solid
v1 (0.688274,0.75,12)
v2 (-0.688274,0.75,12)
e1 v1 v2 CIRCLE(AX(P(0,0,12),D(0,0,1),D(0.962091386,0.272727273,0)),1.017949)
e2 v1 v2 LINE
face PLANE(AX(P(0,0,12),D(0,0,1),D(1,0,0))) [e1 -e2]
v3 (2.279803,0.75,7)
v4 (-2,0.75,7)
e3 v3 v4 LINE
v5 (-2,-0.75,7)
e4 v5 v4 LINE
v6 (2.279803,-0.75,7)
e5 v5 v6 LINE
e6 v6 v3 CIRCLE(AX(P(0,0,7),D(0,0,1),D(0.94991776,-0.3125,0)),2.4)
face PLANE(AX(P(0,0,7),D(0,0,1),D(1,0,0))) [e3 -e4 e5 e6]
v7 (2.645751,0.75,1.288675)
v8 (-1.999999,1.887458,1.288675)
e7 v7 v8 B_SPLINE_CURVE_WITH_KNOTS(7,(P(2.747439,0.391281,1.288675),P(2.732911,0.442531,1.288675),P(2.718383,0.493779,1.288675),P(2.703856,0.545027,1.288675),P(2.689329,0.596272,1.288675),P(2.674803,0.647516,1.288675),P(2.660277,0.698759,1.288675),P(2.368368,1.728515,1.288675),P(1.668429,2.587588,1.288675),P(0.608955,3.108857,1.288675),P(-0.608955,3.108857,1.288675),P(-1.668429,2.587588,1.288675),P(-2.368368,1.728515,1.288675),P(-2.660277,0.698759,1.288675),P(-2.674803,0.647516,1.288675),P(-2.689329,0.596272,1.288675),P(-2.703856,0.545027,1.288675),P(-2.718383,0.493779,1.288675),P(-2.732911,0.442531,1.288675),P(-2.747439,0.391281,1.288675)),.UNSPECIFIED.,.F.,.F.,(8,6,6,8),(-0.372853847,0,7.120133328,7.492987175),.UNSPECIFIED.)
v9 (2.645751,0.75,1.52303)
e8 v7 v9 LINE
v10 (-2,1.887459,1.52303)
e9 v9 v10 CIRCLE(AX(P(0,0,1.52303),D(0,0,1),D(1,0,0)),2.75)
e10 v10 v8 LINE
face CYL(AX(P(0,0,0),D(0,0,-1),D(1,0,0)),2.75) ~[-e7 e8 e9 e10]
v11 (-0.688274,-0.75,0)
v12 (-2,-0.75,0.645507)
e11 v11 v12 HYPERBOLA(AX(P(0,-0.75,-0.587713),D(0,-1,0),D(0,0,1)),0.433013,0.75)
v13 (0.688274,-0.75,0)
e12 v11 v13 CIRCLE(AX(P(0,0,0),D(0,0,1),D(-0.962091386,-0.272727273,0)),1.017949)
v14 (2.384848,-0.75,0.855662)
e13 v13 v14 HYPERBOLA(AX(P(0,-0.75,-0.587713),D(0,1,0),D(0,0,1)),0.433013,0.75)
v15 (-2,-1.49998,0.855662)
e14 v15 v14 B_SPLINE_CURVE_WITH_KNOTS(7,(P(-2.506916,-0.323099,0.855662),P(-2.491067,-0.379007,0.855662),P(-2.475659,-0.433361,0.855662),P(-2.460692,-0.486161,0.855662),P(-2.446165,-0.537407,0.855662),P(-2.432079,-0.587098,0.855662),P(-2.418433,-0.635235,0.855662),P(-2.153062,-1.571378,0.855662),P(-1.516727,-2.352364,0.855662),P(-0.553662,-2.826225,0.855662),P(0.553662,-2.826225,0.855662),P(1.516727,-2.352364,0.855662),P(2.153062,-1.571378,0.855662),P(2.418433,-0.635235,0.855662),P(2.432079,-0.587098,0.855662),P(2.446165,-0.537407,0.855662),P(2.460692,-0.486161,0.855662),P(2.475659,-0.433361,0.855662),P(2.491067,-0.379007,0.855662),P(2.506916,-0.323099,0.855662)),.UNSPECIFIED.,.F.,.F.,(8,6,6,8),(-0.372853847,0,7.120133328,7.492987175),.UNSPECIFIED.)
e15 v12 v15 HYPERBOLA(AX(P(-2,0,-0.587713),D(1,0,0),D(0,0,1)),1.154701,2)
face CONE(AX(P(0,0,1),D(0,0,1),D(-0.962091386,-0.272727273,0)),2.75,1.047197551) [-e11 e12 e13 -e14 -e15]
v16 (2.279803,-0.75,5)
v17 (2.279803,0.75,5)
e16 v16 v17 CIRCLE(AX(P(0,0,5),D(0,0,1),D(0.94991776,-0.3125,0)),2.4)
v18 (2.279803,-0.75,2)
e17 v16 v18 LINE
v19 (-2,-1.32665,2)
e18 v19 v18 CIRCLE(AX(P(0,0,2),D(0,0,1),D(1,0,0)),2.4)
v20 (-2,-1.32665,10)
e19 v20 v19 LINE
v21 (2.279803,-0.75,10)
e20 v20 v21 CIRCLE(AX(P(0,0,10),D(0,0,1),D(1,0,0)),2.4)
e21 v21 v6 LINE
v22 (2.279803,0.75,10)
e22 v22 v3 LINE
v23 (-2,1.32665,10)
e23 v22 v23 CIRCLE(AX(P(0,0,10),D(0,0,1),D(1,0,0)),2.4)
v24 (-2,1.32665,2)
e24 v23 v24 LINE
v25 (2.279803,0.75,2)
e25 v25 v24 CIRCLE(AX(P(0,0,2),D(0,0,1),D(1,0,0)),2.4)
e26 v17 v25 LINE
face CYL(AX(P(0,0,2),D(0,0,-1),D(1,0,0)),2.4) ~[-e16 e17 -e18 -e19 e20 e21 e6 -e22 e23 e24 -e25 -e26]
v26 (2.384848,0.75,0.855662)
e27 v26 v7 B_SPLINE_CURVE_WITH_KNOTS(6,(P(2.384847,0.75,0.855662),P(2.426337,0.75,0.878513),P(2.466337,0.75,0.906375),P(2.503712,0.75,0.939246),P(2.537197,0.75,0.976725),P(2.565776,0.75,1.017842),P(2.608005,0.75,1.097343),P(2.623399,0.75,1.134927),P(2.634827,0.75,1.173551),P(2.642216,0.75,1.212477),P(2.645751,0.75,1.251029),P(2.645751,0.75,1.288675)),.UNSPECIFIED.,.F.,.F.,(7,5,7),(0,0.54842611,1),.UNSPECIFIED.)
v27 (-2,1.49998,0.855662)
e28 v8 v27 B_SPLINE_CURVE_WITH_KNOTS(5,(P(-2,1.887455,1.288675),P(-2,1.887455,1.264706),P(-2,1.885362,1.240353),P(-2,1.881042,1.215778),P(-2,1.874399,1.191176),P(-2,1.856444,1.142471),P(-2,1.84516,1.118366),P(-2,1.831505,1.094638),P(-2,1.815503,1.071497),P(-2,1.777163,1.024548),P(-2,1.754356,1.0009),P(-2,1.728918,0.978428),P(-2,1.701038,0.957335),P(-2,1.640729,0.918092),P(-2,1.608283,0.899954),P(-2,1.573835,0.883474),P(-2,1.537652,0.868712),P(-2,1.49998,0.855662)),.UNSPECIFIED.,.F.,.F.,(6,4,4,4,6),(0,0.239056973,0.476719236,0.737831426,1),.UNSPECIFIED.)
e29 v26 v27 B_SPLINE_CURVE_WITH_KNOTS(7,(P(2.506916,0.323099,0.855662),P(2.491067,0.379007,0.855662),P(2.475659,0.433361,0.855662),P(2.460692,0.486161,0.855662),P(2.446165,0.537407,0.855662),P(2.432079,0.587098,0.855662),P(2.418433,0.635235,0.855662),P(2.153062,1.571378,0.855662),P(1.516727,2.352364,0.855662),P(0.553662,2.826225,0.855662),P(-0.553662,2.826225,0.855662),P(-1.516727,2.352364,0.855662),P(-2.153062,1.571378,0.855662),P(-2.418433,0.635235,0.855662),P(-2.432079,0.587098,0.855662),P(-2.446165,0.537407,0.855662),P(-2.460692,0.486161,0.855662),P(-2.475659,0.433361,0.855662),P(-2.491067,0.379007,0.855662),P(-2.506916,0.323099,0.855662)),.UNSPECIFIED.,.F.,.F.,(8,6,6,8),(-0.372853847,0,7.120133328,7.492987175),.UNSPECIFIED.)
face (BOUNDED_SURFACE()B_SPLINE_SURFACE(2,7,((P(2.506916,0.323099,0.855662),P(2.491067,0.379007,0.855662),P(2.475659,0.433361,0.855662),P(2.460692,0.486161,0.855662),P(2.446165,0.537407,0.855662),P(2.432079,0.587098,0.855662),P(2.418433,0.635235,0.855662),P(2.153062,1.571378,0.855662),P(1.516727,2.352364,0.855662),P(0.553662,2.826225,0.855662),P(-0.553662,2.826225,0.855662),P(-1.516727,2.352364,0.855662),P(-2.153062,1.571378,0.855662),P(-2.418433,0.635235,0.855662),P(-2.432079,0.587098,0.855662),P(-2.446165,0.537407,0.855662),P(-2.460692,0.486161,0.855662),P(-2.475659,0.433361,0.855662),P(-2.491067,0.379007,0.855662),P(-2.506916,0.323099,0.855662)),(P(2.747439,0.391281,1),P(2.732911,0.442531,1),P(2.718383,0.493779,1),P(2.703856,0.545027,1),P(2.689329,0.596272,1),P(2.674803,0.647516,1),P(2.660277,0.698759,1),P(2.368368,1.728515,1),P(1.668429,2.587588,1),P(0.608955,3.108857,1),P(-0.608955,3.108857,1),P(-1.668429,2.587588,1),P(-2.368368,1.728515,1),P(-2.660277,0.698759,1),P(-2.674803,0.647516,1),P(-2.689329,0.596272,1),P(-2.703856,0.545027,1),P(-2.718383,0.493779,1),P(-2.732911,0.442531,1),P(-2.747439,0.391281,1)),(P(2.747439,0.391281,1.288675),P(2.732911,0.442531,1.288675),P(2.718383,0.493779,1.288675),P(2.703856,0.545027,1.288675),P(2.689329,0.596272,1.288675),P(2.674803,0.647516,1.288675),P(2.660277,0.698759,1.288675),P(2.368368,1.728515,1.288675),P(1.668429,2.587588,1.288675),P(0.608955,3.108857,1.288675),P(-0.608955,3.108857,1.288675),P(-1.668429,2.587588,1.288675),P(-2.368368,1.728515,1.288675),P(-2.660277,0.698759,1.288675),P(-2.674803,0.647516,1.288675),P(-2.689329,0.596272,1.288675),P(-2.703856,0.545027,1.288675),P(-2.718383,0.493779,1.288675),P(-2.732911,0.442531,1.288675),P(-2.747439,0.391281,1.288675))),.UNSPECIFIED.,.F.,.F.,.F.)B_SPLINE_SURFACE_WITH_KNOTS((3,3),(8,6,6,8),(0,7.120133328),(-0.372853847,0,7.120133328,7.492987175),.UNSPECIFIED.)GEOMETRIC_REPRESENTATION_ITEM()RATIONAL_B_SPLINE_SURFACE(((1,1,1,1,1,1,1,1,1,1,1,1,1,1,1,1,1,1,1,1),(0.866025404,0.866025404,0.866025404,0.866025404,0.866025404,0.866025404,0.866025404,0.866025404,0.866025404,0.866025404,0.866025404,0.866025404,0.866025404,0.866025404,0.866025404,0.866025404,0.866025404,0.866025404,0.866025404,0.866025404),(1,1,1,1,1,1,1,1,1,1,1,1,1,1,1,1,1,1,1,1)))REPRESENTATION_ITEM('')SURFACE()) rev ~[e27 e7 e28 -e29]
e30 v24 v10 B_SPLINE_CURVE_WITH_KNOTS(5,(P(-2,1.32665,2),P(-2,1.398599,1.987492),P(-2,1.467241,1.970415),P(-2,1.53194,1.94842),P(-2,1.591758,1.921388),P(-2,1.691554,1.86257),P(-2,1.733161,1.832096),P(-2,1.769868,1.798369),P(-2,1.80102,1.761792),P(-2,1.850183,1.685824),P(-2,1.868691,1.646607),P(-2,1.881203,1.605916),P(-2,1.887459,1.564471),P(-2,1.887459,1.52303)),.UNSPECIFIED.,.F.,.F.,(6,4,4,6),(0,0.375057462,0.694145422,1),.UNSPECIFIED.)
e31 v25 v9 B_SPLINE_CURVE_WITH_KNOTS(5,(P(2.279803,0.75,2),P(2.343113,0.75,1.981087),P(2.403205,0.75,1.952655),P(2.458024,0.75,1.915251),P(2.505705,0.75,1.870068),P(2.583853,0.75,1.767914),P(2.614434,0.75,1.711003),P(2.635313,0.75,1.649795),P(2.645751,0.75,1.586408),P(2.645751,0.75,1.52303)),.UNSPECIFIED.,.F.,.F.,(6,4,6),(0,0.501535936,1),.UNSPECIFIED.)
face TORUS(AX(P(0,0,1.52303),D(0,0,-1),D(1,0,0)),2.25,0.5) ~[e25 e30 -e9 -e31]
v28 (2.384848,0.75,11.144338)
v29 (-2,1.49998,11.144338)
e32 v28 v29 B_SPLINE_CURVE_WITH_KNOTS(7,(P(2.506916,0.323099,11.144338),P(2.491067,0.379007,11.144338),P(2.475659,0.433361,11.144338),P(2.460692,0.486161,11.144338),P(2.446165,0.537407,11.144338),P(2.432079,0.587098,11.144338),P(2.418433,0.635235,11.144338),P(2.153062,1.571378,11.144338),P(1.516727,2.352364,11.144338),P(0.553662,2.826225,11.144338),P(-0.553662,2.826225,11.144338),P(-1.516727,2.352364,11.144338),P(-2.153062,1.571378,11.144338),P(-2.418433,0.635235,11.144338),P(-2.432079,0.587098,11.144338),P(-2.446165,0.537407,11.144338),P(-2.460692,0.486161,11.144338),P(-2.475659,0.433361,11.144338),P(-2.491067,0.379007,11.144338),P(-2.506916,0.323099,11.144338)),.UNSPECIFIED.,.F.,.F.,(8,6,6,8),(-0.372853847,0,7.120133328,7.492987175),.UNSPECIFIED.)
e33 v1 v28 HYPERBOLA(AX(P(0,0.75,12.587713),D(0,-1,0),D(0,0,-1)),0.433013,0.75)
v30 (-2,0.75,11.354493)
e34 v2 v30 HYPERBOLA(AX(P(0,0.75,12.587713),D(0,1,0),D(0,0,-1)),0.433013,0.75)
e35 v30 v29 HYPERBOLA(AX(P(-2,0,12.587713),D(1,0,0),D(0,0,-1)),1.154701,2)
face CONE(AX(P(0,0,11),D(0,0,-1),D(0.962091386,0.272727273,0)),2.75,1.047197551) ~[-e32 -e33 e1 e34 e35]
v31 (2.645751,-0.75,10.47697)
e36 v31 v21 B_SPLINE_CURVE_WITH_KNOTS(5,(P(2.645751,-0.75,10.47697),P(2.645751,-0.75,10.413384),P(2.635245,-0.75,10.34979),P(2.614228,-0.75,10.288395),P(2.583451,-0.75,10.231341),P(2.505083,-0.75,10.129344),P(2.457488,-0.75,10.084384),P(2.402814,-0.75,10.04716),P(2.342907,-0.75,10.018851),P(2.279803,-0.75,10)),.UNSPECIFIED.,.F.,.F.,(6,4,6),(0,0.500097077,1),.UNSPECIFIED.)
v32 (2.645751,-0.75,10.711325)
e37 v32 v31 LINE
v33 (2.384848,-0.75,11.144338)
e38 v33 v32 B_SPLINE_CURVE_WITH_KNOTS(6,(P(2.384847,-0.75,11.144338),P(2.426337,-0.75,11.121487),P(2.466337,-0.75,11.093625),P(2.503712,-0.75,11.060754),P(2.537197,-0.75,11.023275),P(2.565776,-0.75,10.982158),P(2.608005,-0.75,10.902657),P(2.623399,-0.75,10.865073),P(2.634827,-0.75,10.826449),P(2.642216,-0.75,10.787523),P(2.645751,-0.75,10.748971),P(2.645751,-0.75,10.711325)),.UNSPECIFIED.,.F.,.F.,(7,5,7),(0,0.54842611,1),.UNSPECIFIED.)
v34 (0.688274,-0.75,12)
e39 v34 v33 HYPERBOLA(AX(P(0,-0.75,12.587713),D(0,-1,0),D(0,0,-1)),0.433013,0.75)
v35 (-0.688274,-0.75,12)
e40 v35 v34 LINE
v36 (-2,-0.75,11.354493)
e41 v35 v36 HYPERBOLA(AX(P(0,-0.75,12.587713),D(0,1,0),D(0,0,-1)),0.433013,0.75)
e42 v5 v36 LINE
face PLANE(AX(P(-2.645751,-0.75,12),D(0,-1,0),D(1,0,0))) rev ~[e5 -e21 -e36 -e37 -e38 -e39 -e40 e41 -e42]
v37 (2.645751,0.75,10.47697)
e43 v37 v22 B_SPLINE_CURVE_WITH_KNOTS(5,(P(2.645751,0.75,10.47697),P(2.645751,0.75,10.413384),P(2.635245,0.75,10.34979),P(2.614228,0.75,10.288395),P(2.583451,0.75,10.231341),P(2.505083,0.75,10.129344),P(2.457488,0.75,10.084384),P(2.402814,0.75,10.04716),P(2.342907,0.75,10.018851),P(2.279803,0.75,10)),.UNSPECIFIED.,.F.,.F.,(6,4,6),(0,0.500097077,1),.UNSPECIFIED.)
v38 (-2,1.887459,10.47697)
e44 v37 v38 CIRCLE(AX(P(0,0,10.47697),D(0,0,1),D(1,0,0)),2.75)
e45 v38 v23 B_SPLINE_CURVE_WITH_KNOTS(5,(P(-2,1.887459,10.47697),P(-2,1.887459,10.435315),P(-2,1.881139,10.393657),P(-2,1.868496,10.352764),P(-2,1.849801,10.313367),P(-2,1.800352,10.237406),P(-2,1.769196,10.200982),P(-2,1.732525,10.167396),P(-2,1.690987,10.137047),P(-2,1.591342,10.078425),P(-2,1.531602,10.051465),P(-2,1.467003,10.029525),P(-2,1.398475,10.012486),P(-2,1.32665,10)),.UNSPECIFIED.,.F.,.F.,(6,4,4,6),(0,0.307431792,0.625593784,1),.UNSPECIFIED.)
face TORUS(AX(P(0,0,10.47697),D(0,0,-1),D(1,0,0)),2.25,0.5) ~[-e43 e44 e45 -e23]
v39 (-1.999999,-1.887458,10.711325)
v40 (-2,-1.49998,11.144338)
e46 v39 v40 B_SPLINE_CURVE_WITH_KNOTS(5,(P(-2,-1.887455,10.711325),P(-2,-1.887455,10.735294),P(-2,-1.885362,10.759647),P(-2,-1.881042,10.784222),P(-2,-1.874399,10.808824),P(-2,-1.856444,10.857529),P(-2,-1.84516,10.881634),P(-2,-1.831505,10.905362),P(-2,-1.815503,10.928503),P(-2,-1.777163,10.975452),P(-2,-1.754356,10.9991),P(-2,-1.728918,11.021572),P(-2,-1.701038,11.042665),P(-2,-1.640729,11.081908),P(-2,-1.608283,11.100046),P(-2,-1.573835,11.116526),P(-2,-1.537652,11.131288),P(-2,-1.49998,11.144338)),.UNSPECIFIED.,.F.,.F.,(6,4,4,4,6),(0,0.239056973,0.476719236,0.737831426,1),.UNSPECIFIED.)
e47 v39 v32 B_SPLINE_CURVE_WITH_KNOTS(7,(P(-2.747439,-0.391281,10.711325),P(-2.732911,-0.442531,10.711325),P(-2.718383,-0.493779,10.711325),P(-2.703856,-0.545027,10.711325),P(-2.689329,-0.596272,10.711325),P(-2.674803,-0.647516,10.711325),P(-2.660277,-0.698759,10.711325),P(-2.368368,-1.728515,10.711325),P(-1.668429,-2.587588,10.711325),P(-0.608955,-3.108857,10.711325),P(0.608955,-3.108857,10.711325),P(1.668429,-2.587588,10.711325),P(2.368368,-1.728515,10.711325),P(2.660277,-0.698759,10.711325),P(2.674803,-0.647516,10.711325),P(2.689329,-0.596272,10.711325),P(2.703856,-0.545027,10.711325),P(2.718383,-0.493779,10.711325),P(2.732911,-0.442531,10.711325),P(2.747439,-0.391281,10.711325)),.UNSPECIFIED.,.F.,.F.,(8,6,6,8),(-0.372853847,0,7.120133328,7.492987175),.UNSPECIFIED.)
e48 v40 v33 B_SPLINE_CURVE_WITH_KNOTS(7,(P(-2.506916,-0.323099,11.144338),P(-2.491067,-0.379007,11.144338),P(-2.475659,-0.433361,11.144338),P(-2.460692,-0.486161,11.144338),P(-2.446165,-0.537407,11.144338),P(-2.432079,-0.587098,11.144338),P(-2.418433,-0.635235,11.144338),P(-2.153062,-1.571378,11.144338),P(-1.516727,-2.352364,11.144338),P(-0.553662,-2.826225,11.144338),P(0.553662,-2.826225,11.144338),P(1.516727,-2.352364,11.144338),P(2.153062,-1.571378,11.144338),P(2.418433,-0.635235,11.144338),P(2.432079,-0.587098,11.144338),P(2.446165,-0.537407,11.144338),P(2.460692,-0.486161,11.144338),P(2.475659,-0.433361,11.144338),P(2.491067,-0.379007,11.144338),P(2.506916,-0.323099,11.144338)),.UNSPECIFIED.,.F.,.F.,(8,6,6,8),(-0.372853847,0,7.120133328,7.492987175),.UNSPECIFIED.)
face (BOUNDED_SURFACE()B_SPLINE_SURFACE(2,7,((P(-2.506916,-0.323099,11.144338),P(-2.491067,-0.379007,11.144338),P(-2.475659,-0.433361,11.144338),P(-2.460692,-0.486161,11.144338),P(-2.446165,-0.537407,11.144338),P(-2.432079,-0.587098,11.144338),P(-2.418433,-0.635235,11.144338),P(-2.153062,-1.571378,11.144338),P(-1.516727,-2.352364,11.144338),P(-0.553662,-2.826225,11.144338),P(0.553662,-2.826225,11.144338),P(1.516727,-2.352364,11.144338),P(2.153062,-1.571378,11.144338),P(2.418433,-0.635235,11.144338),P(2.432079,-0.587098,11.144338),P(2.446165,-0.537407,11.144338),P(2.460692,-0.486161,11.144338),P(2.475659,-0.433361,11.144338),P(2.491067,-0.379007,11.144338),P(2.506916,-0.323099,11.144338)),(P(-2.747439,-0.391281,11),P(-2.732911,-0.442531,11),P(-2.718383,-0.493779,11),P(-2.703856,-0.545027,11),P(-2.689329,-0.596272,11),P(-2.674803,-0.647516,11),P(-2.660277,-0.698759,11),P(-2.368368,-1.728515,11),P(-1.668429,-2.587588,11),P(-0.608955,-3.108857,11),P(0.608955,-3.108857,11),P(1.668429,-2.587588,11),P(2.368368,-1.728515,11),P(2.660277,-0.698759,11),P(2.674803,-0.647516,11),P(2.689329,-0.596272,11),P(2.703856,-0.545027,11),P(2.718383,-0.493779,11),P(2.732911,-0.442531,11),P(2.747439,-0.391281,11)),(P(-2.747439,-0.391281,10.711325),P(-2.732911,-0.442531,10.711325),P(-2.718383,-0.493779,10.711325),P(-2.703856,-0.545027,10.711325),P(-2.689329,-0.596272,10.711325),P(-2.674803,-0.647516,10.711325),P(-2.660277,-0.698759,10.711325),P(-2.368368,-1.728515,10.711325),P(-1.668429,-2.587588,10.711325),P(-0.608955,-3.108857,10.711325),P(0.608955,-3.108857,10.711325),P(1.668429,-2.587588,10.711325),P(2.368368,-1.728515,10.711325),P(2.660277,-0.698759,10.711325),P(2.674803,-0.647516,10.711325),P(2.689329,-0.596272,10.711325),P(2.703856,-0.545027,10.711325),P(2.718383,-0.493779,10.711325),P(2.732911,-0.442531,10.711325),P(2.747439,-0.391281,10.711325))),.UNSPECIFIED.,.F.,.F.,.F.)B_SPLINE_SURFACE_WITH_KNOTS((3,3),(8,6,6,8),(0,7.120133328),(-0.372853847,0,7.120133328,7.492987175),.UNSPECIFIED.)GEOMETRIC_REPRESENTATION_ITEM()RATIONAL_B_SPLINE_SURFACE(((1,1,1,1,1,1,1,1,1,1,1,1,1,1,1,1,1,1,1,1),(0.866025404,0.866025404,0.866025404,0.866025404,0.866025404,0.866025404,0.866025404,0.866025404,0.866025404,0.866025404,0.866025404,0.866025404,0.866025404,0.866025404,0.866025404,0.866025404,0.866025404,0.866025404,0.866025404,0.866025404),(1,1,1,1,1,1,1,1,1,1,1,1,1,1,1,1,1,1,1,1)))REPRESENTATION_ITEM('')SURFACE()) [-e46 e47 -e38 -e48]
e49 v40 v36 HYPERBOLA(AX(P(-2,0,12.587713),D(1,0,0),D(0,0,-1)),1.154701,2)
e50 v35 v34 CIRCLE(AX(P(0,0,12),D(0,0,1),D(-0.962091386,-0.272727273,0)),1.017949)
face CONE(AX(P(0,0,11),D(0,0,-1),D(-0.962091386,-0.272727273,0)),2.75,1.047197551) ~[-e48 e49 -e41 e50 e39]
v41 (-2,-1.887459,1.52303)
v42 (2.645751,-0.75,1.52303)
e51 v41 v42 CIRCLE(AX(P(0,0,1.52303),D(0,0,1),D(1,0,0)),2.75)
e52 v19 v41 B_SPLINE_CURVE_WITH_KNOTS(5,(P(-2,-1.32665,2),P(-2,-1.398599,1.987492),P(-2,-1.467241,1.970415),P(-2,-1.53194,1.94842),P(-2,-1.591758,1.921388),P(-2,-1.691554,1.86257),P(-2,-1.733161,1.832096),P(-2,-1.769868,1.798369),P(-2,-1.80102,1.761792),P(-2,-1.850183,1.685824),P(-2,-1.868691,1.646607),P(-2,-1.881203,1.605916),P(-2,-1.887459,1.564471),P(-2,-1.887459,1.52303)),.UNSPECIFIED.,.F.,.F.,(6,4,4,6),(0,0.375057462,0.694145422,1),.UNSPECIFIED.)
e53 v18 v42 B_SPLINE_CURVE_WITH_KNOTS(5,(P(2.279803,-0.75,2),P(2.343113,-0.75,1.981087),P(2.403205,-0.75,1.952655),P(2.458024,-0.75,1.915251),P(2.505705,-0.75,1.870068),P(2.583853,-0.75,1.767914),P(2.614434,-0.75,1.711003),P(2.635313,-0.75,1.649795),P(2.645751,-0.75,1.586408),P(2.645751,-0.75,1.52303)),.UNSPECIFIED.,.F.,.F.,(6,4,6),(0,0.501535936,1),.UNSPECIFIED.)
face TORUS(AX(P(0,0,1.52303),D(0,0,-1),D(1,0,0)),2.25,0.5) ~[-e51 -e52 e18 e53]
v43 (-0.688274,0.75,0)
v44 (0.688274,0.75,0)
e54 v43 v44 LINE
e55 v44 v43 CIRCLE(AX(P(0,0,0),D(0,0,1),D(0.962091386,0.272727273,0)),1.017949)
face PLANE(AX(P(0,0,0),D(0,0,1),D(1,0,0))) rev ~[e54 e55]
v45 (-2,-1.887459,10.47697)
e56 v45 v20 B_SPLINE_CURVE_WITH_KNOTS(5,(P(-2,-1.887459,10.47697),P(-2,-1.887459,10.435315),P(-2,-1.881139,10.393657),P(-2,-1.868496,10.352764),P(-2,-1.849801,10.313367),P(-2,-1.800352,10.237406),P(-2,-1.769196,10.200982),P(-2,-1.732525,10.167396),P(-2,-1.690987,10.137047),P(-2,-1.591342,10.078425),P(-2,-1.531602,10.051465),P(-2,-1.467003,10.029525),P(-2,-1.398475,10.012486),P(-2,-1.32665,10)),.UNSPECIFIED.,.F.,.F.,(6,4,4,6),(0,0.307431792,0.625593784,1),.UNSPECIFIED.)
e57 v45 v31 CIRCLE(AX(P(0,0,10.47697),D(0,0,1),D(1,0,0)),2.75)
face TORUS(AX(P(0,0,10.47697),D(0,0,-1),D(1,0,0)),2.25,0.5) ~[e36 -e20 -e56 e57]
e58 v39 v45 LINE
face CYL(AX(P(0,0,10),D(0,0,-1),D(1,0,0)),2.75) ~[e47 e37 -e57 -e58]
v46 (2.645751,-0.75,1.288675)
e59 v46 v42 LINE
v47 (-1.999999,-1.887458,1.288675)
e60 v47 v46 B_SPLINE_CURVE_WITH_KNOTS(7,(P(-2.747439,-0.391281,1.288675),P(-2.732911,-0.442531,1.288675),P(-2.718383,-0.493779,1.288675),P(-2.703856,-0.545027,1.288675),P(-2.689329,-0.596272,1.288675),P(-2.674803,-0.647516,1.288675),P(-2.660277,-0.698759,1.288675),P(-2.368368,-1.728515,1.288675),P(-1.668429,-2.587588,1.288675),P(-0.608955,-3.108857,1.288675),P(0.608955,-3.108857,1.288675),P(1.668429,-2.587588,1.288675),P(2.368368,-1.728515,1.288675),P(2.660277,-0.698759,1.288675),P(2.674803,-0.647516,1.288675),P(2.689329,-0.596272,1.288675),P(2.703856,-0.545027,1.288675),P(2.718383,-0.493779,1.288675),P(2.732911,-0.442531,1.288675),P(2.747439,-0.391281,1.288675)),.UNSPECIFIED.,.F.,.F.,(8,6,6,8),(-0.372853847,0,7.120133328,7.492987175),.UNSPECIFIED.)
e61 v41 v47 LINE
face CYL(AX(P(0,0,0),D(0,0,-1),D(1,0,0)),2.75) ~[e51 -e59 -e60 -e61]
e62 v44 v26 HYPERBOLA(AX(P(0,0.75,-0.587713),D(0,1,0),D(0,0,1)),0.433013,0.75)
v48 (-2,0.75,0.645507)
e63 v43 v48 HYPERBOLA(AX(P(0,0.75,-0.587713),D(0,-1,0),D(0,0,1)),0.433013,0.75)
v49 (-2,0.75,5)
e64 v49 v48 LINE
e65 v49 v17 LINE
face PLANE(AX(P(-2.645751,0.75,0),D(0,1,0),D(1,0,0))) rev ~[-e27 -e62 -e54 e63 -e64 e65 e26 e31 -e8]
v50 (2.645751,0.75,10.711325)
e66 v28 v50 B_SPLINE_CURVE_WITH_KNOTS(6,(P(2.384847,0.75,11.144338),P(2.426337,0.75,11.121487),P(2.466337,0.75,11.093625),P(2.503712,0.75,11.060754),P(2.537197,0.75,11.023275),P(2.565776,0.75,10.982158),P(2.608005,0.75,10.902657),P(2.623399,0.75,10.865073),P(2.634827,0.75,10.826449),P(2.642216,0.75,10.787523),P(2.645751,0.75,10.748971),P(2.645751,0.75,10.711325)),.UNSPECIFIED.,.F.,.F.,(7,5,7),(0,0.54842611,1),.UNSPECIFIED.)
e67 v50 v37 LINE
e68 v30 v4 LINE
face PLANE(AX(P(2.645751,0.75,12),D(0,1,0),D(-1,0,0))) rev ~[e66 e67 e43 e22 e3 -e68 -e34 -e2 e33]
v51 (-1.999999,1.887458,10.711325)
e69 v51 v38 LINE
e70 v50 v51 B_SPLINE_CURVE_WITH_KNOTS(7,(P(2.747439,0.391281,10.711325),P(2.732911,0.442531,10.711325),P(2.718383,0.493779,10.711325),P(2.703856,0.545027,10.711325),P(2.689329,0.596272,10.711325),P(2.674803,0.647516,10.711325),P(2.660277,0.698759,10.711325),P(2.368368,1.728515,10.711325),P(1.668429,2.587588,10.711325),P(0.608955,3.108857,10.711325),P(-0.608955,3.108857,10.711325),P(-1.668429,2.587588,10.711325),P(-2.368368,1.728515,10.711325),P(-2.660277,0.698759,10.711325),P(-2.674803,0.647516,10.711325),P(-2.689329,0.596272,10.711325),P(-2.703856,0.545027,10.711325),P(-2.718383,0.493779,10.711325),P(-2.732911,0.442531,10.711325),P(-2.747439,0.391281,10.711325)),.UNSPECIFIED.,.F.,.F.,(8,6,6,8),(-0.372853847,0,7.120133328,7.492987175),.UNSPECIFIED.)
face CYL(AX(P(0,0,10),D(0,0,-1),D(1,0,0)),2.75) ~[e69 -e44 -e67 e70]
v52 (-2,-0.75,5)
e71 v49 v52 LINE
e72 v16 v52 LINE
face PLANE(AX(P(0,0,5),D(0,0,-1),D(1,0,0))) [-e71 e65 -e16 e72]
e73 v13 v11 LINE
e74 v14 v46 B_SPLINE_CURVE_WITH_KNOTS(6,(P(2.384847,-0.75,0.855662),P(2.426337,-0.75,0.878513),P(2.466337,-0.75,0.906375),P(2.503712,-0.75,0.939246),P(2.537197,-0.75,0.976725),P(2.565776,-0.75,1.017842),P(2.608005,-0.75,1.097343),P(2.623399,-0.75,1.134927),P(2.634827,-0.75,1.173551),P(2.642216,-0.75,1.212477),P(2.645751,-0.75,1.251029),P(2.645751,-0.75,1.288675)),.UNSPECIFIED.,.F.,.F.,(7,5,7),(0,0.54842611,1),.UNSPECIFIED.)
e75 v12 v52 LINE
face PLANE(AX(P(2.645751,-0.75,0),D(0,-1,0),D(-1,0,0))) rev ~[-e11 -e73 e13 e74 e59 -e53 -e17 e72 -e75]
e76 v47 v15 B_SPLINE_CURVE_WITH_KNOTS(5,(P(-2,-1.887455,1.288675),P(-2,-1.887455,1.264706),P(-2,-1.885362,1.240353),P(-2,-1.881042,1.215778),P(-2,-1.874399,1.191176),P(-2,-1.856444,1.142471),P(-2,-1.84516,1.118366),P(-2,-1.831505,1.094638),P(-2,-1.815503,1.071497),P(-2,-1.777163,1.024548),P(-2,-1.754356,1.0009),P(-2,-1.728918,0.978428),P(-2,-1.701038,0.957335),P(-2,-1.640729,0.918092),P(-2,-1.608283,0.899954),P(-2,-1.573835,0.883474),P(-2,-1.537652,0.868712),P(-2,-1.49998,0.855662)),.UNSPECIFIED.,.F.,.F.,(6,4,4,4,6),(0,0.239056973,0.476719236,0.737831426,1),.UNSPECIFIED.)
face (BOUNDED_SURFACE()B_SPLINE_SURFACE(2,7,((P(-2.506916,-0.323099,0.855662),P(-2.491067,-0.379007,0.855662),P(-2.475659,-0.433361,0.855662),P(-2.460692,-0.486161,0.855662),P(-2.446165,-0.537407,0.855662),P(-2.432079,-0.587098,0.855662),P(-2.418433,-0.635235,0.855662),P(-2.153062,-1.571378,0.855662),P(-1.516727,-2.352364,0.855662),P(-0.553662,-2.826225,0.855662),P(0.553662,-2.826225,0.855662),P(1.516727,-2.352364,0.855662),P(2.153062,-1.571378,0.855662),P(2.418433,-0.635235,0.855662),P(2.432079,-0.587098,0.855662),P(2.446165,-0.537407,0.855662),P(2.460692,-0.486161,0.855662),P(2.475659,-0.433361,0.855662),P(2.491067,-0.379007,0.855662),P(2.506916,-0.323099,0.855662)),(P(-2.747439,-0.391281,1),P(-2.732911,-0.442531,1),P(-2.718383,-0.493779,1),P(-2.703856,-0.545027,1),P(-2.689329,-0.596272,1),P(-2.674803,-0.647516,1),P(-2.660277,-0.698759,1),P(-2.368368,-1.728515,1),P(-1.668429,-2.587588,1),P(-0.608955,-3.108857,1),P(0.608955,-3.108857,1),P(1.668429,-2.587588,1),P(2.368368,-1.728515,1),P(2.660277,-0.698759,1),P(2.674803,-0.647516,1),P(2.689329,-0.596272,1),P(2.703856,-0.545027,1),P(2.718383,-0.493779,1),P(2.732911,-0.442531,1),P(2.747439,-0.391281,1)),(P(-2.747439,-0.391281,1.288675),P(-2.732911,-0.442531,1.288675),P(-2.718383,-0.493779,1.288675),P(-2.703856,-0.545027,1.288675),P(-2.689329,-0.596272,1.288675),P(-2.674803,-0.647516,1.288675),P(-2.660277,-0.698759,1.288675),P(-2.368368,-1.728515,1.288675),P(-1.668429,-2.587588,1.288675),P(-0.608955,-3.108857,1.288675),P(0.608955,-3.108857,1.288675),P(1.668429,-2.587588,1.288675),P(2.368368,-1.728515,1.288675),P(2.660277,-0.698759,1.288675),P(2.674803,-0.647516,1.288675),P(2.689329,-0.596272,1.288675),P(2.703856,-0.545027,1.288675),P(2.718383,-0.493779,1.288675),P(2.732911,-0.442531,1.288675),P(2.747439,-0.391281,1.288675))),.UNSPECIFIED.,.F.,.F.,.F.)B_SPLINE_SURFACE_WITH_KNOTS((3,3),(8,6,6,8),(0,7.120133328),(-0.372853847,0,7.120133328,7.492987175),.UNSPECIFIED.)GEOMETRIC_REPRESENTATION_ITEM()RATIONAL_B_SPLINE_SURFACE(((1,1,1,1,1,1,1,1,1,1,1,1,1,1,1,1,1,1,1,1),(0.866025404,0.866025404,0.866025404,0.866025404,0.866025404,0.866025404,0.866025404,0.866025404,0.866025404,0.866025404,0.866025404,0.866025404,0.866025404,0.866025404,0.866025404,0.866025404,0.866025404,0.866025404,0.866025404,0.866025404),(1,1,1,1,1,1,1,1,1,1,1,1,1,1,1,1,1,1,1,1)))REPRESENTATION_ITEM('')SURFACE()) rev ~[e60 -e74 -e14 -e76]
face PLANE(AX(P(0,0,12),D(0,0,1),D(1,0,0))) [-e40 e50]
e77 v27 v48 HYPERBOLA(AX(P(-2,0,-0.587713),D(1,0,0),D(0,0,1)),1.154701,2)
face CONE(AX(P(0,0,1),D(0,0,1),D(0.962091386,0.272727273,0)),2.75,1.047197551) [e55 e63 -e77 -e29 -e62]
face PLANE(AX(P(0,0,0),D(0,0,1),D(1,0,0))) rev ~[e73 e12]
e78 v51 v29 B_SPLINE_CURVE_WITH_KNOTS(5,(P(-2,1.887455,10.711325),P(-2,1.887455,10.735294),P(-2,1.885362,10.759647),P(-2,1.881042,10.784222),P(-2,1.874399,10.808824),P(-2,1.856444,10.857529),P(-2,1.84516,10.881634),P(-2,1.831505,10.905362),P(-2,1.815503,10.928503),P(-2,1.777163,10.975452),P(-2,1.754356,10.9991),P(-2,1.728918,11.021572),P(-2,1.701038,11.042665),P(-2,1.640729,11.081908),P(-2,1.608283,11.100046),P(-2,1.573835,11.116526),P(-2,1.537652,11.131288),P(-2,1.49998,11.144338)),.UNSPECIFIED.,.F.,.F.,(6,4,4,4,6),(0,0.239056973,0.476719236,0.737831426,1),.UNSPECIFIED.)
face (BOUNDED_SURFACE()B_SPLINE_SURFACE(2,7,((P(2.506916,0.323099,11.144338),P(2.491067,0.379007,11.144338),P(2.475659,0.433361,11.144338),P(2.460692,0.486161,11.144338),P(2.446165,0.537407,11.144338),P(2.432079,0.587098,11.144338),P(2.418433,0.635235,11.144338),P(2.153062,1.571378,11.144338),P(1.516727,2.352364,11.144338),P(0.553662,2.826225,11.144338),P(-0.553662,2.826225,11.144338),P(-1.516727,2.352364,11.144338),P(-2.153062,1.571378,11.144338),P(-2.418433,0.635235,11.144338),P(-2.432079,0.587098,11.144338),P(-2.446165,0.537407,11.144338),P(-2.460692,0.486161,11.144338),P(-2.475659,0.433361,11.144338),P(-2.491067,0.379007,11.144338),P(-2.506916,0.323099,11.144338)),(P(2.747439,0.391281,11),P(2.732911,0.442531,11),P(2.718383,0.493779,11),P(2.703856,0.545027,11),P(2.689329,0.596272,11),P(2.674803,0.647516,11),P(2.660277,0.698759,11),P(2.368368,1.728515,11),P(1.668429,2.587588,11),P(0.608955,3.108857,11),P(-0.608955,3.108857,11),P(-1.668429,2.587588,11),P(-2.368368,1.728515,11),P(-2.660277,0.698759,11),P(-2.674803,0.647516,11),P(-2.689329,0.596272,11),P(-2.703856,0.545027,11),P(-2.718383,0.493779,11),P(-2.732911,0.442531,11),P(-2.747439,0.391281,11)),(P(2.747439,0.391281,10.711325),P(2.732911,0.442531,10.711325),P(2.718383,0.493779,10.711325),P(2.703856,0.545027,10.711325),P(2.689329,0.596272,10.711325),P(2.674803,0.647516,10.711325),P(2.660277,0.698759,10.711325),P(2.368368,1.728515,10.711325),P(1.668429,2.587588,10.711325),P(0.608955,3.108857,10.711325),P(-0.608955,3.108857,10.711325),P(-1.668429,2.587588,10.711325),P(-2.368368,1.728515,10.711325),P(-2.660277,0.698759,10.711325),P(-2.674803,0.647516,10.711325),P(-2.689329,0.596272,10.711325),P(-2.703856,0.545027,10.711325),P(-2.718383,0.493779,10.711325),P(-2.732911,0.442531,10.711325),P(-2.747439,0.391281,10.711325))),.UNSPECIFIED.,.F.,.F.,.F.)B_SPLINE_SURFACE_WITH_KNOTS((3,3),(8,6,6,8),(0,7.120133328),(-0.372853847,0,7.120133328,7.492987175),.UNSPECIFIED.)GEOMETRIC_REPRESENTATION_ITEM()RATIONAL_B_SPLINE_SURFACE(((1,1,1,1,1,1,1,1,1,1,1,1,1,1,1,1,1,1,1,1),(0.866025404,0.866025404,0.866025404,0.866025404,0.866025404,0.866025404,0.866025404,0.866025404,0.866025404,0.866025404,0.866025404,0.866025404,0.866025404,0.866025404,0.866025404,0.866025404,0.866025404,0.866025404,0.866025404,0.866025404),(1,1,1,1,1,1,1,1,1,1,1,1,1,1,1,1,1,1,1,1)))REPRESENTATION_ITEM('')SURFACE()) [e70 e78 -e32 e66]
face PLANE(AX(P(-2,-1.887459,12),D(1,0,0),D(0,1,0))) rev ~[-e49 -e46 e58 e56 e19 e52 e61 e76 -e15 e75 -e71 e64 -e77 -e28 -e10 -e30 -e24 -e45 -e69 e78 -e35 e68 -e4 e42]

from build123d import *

# Parameters (mm, degrees)
F0_R         = 2.75
F1_DEPTH     = 2
F2_R         = 2.4
F3_DEPTH     = 8
F4_R         = 2.75
F5_DEPTH     = 2
F8_DEPTH     = 5
F10_DEPTH    = 5
F11_C1_SIZE2 = 1
F11_C1_SIZE  = 1.7320508076
F11_C2_SIZE2 = 1
F11_C2_SIZE  = 1.7320508076
F12_C1_SIZE2 = 1
F12_C1_SIZE  = 1.7320508076
F12_C2_SIZE2 = 1
F12_C2_SIZE  = 1.7320508076
F13_R        = 0.5
F15_DEPTH    = 25


# Not quite as in the source:
# - a fillet or chamfer that OpenCascade refuses, or shapes differently, is made with other operations: its cross-section is extruded or revolved along the edge and cut away or added


with BuildPart() as f1:
    # F0 (on Top) → F1 (new body)
    with BuildSketch(Plane.XY):
        Circle(F0_R)
    extrude(amount=F1_DEPTH)

    # F2 (on face) → F3 (join)
    with BuildSketch(Plane.XY.offset(2)):
        Circle(F2_R)
    extrude(amount=F3_DEPTH)

    # F4 (on face) → F5 (join)
    with BuildSketch(Plane.XY.offset(10)):
        Circle(F4_R)
    extrude(amount=F5_DEPTH)

    # F6: fillet of radius 0.5 on 2 edges, made by hand

    # F6_s1 → F6_t2 (revolve, cut)
    with BuildSketch(Plane.XZ):
        with BuildLine():
            ThreePointArc((2.4, 2), (2.6531128874, 1.8188343884), (2.75, 1.5230303993))
            Line((2.75, 1.5230303993), (2.75, 2))
            Line((2.75, 2), (2.4, 2))
        make_face()
    revolve(axis=Axis((0, 0, 2), (0, 0, 1)), mode=Mode.SUBTRACT)

    # F6_s3 → F6_t4 (revolve, cut)
    with BuildSketch(Plane.XZ):
        with BuildLine():
            ThreePointArc((2.75, 10.4769696007), (2.6531128874, 10.1811656116), (2.4, 10))
            Line((2.4, 10), (2.75, 10))
            Line((2.75, 10), (2.75, 10.4769696007))
        make_face()
    revolve(axis=Axis((0, 0, 10), (0, 0, 1)), mode=Mode.SUBTRACT)

    # F7 (on face) → F8 (cut)
    with BuildSketch(Plane(origin=(0, 0, 0), x_dir=(1, 0, 0), z_dir=(0, 0, -1))):
        with BuildLine():
            ThreePointArc((-2.6457513111, 0.75), (-2.75, 0), (-2.6457513111, -0.75))
            Line((-2.6457513111, -0.75), (2.6457513111, -0.75))
            ThreePointArc((2.6457513111, -0.75), (2.75, 0), (2.6457513111, 0.75))
            Line((2.6457513111, 0.75), (-2.6457513111, 0.75))
        make_face()
    extrude(amount=-F8_DEPTH, mode=Mode.SUBTRACT)

    # F9 (on face) → F10 (cut)
    with BuildSketch(Plane.XY.offset(12)):
        with BuildLine():
            ThreePointArc((-2.6457513111, 0.75), (-2.75, 0), (-2.6457513111, -0.75))
            Line((-2.6457513111, -0.75), (2.6457513111, -0.75))
            ThreePointArc((2.6457513111, -0.75), (2.75, 0), (2.6457513111, 0.75))
            Line((2.6457513111, 0.75), (-2.6457513111, 0.75))
        make_face()
    extrude(amount=-F10_DEPTH, mode=Mode.SUBTRACT)

    # F11: chamfer of 1 x 1.7320508076 on 2 edges, made by hand

    # F11_c1
    f11_c1_edges = [f1.edges().sort_by_distance(p)[0] for p in [
        (0, 2.75, 0),
    ]]
    f11_c1_side = f1.faces().sort_by_distance((0, 2.73, 0))[0]
    chamfer(f11_c1_edges, length=F11_C1_SIZE, length2=F11_C1_SIZE2, reference=f11_c1_side)

    # F11_c2
    f11_c2_edges = [f1.edges().sort_by_distance(p)[0] for p in [
        (0, -2.75, 0),
    ]]
    f11_c2_side = f1.faces().sort_by_distance((0, -2.73, 0))[0]
    chamfer(f11_c2_edges, length=F11_C2_SIZE, length2=F11_C2_SIZE2, reference=f11_c2_side)

    # F12: chamfer of 1 x 1.7320508076 on 2 edges, made by hand

    # F12_c1
    f12_c1_edges = [f1.edges().sort_by_distance(p)[0] for p in [
        (0, -2.75, 12),
    ]]
    f12_c1_side = f1.faces().sort_by_distance((0, -2.73, 12))[0]
    chamfer(f12_c1_edges, length=F12_C1_SIZE, length2=F12_C1_SIZE2, reference=f12_c1_side)

    # F12_c2
    f12_c2_edges = [f1.edges().sort_by_distance(p)[0] for p in [
        (0, 2.75, 12),
    ]]
    f12_c2_side = f1.faces().sort_by_distance((0, 2.73, 12))[0]
    chamfer(f12_c2_edges, length=F12_C2_SIZE, length2=F12_C2_SIZE2, reference=f12_c2_side)

    # F13
    f13_edges = [f1.edges().sort_by_distance(p)[0] for p in [
        (0, -2.75, 11),
        (0, 2.75, 11),
        (0, -2.75, 1),
        (0, 2.75, 1),
    ]]
    fillet(f13_edges, radius=F13_R)

    # F14 (on face) → F15 (cut)
    with BuildSketch(Plane.XY.offset(12)):
        with BuildLine():
            Line((-2, -1.8874586088), (-2, 1.8874586088))
            ThreePointArc((-2, 1.8874586088), (-2.75, 0), (-2, -1.8874586088))
        make_face()
    extrude(amount=-F15_DEPTH, mode=Mode.SUBTRACT)


solid = f1.part
